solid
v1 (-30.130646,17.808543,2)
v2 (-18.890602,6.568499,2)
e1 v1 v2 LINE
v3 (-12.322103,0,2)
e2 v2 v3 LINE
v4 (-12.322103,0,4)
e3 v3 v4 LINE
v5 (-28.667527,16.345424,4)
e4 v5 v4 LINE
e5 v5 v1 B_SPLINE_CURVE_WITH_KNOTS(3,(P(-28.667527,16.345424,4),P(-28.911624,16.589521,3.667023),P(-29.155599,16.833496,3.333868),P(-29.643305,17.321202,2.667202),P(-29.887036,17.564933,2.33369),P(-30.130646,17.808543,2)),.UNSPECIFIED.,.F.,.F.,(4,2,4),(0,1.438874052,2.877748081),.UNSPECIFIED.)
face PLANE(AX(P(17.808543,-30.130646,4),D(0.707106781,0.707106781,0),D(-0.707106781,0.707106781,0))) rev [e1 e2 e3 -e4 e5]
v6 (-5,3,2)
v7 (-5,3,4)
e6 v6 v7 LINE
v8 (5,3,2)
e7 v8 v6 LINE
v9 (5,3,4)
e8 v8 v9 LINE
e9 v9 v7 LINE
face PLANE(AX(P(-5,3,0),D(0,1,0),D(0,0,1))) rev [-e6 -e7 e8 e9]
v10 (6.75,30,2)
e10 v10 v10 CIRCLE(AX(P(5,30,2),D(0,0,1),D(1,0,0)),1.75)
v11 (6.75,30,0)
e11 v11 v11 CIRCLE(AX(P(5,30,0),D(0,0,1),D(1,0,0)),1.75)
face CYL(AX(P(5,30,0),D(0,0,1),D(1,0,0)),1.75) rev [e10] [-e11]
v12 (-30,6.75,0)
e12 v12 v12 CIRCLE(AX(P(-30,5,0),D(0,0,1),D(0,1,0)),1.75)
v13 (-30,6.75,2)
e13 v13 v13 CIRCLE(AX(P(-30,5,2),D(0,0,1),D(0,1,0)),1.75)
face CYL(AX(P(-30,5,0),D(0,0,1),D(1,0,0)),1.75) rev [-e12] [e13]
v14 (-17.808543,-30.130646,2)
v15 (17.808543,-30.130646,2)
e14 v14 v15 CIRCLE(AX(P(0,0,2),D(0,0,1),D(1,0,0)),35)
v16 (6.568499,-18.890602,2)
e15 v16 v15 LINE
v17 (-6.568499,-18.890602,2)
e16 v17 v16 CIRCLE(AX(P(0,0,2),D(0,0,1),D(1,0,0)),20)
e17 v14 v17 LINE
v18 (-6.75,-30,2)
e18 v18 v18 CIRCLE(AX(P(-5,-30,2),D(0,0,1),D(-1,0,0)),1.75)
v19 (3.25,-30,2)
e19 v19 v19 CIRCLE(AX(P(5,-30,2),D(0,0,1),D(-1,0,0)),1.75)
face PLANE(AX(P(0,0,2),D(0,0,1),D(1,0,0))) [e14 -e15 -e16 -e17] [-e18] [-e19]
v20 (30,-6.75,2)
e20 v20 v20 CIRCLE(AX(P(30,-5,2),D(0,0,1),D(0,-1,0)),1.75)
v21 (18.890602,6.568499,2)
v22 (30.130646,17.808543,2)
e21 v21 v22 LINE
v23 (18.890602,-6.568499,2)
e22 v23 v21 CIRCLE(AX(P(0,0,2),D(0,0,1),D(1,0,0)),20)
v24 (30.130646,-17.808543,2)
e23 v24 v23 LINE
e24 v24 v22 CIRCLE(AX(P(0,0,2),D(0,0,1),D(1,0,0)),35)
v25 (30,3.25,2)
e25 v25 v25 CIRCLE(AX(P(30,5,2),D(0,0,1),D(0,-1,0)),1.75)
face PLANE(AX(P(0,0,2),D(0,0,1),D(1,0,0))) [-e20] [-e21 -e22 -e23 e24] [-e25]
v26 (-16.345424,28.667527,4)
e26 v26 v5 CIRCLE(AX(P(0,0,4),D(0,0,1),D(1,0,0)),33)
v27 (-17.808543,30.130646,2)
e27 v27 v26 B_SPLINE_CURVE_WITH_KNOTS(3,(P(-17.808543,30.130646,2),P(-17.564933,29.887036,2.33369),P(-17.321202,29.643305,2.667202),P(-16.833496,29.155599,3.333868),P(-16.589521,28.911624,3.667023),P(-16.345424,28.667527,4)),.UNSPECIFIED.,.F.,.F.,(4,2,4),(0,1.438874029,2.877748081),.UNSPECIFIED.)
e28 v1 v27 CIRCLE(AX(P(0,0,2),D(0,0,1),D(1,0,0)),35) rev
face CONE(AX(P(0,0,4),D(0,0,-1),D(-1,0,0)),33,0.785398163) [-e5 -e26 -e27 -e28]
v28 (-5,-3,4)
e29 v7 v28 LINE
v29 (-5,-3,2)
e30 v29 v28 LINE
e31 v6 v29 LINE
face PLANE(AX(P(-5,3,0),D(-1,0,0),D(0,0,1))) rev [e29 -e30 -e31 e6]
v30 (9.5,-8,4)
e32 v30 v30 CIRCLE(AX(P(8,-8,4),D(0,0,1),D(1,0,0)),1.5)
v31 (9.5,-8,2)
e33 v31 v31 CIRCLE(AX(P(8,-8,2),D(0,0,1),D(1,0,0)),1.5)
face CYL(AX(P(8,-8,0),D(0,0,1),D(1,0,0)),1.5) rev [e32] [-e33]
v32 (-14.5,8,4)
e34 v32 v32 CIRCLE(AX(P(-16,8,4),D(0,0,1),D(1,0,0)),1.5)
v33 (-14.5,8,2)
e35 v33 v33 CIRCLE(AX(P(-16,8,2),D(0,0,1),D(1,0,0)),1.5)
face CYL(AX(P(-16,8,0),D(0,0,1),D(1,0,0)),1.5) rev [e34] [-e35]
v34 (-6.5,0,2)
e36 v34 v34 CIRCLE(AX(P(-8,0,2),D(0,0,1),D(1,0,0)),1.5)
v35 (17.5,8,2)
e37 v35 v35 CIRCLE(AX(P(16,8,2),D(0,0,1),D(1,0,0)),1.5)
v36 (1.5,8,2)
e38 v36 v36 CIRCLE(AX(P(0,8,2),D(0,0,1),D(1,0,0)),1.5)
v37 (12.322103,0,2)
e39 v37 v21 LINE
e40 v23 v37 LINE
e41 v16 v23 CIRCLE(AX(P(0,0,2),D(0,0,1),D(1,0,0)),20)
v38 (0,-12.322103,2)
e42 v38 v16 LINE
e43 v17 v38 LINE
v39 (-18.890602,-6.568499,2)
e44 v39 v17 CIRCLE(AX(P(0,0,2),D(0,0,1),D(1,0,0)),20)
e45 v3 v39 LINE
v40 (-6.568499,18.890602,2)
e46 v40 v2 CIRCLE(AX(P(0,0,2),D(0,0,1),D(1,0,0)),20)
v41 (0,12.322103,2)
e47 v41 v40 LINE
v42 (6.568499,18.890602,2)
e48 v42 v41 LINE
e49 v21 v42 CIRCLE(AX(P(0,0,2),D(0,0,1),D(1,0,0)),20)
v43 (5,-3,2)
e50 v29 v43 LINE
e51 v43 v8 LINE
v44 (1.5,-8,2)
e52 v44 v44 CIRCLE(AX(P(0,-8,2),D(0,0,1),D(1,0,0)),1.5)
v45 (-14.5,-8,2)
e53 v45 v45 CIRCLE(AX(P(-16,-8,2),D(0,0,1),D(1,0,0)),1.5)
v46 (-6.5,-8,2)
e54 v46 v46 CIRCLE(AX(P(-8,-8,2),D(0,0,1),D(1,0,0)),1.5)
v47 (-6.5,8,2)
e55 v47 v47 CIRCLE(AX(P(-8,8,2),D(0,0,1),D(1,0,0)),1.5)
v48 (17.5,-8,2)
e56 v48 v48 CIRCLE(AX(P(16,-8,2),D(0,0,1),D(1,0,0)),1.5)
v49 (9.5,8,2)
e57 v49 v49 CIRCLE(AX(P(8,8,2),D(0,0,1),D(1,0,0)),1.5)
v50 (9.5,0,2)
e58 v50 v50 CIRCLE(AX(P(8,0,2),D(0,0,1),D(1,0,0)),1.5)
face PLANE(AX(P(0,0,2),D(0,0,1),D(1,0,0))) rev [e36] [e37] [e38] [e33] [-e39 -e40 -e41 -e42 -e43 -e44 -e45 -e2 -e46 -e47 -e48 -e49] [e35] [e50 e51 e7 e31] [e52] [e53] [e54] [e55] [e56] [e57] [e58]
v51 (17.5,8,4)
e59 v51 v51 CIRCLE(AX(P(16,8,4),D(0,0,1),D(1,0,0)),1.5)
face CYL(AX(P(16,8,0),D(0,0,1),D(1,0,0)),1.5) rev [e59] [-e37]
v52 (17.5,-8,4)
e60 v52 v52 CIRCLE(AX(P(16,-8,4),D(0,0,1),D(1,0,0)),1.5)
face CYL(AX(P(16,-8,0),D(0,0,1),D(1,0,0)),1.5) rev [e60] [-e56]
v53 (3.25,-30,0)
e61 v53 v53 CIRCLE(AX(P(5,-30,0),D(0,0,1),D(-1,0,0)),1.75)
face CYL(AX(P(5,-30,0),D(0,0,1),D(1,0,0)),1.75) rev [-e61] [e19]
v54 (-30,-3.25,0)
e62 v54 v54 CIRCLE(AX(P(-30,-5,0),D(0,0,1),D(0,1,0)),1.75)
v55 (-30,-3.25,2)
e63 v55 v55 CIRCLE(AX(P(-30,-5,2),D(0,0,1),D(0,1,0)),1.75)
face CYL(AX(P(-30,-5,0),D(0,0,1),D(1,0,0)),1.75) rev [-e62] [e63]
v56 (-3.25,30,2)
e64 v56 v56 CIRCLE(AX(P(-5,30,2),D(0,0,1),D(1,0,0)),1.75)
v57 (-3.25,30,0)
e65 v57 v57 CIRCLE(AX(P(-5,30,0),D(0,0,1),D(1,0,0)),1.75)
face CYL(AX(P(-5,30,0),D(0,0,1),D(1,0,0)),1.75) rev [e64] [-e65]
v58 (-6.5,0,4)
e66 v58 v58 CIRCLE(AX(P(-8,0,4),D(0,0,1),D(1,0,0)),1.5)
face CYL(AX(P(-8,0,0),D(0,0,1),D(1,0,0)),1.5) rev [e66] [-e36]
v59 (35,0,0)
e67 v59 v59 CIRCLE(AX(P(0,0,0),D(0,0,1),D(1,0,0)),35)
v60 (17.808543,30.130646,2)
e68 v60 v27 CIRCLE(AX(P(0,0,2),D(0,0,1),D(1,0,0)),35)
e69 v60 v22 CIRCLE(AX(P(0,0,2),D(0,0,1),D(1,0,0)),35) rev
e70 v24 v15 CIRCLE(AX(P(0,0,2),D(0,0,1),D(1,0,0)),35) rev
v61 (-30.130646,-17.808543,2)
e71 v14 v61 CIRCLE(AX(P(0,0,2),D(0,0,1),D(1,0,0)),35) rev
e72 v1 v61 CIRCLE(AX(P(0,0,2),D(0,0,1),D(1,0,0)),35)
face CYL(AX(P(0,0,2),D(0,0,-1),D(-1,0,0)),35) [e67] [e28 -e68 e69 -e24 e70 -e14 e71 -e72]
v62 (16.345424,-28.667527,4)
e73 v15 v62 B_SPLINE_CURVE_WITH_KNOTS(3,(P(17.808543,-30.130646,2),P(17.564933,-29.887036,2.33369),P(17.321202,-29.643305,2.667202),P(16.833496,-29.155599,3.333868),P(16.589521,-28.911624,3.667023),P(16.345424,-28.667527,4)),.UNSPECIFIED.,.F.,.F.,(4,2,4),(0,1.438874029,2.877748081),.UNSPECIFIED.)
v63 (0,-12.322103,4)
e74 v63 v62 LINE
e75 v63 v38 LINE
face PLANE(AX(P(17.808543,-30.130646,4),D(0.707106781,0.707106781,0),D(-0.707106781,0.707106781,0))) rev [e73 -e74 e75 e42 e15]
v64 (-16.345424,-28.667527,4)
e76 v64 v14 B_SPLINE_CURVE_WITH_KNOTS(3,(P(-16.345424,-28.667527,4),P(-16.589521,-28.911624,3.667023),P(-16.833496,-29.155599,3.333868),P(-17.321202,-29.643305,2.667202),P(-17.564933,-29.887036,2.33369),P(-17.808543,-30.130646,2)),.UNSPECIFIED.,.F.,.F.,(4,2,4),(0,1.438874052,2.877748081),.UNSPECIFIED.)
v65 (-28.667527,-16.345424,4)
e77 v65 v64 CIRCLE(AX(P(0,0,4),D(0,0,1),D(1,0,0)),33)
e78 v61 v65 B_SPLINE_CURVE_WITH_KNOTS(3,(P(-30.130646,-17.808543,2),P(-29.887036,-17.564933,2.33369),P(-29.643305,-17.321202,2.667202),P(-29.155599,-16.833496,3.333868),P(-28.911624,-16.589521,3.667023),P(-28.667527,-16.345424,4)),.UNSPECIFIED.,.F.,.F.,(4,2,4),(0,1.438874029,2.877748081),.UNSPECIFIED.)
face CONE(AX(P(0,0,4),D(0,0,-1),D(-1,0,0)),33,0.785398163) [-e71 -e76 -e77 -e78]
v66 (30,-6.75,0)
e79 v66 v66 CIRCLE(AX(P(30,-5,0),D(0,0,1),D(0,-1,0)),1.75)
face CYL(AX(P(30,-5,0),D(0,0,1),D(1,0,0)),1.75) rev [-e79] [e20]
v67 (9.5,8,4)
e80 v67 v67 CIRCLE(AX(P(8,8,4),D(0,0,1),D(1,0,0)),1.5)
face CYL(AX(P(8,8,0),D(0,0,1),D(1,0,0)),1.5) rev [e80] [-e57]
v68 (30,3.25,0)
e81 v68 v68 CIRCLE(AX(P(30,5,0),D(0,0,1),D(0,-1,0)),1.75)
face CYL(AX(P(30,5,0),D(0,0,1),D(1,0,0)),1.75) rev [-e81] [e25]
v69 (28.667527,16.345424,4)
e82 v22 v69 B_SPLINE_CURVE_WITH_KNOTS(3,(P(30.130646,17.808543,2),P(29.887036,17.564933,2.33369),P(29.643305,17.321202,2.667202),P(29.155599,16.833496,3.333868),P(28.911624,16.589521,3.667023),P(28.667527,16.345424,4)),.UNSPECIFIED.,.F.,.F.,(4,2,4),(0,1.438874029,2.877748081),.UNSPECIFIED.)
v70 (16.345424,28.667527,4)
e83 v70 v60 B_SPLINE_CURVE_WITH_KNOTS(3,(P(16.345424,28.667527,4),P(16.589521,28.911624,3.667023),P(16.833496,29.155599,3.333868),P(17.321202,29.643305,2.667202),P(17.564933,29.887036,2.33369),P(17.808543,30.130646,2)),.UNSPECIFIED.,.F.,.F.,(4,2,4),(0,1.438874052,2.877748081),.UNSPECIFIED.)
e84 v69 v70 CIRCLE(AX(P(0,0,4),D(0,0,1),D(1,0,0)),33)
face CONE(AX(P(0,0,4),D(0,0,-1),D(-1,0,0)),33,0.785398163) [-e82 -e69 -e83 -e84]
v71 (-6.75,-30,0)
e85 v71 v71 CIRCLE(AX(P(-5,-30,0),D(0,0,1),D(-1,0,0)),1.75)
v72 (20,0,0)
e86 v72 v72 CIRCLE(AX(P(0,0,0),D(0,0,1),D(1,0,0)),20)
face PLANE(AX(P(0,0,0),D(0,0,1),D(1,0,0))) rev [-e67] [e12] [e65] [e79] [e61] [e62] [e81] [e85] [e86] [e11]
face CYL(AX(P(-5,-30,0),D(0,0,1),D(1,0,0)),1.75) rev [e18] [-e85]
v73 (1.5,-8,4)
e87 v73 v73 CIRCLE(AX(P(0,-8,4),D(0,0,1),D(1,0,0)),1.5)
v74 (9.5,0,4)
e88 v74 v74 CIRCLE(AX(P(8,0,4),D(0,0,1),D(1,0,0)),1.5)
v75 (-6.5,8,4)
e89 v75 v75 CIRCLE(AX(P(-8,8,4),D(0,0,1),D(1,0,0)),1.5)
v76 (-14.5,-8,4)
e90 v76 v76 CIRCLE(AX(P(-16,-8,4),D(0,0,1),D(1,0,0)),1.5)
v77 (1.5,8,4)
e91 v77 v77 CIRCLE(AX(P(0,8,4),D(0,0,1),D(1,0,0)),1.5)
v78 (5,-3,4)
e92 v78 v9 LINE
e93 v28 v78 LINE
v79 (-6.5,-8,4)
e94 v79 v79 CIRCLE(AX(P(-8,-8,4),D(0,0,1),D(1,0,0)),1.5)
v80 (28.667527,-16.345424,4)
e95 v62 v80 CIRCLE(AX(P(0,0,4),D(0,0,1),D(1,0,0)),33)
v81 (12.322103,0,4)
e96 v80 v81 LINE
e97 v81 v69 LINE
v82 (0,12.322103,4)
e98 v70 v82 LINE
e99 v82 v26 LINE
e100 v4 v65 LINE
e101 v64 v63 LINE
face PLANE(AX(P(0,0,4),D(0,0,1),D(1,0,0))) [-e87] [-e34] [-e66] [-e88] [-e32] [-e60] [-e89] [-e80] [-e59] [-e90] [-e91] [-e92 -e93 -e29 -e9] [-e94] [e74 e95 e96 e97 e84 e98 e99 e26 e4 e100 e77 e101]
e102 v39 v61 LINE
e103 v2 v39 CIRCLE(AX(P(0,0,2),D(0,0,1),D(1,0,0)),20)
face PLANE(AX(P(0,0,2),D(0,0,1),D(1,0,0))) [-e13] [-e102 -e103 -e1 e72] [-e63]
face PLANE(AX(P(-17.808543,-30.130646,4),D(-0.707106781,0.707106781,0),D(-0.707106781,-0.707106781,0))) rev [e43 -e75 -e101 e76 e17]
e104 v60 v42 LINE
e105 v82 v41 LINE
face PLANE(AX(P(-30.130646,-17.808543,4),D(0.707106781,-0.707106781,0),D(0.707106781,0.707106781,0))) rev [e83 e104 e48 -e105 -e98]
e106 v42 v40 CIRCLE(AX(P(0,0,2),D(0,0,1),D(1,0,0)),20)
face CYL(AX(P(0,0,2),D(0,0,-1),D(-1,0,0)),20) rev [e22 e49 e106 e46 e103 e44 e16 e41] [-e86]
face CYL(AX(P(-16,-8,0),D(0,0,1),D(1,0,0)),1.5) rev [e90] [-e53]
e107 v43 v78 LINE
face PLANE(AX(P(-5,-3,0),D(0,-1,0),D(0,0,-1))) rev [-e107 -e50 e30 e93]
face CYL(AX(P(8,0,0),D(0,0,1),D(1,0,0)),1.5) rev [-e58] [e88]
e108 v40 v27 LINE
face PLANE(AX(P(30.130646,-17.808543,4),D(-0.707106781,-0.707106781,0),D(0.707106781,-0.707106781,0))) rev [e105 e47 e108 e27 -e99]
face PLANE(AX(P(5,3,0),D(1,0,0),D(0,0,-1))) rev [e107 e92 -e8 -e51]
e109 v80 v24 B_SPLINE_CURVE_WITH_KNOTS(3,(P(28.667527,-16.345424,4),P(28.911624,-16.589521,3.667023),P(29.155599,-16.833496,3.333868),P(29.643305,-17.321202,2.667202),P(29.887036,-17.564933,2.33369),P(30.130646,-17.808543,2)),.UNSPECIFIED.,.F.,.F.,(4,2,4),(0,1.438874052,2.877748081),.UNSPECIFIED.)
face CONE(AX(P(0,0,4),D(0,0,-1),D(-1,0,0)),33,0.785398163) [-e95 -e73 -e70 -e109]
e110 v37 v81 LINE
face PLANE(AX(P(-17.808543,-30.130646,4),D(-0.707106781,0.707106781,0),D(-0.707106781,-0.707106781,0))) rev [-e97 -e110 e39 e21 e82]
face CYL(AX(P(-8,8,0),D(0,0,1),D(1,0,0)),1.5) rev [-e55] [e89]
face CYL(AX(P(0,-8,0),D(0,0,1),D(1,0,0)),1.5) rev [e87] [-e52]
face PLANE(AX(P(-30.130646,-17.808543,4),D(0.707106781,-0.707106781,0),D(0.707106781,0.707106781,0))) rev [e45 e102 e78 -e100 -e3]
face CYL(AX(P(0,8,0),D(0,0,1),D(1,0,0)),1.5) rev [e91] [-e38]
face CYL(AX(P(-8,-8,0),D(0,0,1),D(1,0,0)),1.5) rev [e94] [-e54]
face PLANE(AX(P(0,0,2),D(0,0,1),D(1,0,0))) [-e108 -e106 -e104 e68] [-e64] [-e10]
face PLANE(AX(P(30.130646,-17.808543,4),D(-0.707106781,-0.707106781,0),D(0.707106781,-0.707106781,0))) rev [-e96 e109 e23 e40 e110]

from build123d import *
from build123d.topology import SkipClean

# Parameters (mm, degrees)
SKETCH1_R                    = 35
SKETCH1_R_2                  = 20
BOSS_EXTRUDE1_DEPTH          = 2
SKETCH2_R                    = 1.75
CUT_EXTRUDE1_DEPTH           = 50.537864306
CIRPATTERN1_COUNT            = 4
BOSS_EXTRUDE2_DEPTH          = 2
CHAMFER1_SIZE                = 2
CIRPATTERN2_COUNT            = 2
CIRPATTERN2_ANGLE            = 90
CHAMFER1_OF_CIRPATTERN2_SIZE = 2
SKETCH5_R                    = 1.5
SKETCH5_W                    = 10
SKETCH5_H                    = 6
CUT_EXTRUDE2_DEPTH           = 50.658836072


with BuildPart() as part:
    # Sketch1 → Boss-Extrude1 (new body)
    with BuildSketch(Plane.XY):
        Circle(SKETCH1_R)
        Circle(SKETCH1_R_2, mode=Mode.SUBTRACT)
    extrude(amount=BOSS_EXTRUDE1_DEPTH)

    # Sketch2 → Cut-Extrude1 (cut, through all)
    with BuildSketch(Plane.XY.offset(2)):
        with Locations((5, 30)):
            Circle(SKETCH2_R)
        with Locations((-5, 30)):
            Circle(SKETCH2_R)
    cut_extrude1 = extrude(amount=-CUT_EXTRUDE1_DEPTH, mode=Mode.SUBTRACT)

    # CirPattern1: Cut-Extrude1 ×4 about axis
    cirpattern1_axis = Axis((0, 0, 0), (0, 0, 1))
    for i in range(1, CIRPATTERN1_COUNT):
        add(cut_extrude1.rotate(cirpattern1_axis, i * 360 / CIRPATTERN1_COUNT), mode=Mode.SUBTRACT)

    # Sketch3 → Boss-Extrude2 (add)
    with SkipClean():  # the faces are left unmerged after this step: merging them gives an invalid solid
        with BuildSketch(Plane.XY.offset(2)):
            with BuildLine():
                Line((-30.130645656, -17.80854268), (17.80854268, 30.130645656))
                ThreePointArc((17.80854268, 30.130645656), (24.748737342, 24.748737342), (30.130645656, 17.80854268))
                Line((30.130645656, 17.80854268), (-17.80854268, -30.130645656))
                ThreePointArc((-17.80854268, -30.130645656), (-24.748737342, -24.748737342), (-30.130645656, -17.80854268))
            make_face()
        boss_extrude2 = extrude(amount=BOSS_EXTRUDE2_DEPTH)

    # Chamfer1
    chamfer1_edges = [part.edges().sort_by_distance(p)[0] for p in [
        (-24.748737342, -24.748737342, 4),
        (24.748737342, 24.748737342, 4),
    ]]
    chamfer(chamfer1_edges, length=CHAMFER1_SIZE - 0.0001)  # a hair under: the kernel refuses the full size

    # CirPattern2: Boss-Extrude2 ×2 about axis
    with SkipClean():  # the faces are left unmerged after this step: merging them gives an invalid solid
        cirpattern2_axis = Axis((0, 0, 0), (0, 0, 1))
        for i in range(1, CIRPATTERN2_COUNT):
            add(boss_extrude2.rotate(cirpattern2_axis, i * CIRPATTERN2_ANGLE / (CIRPATTERN2_COUNT - 1)))

    # Chamfer1 of CirPattern2
    chamfer1_of_cirpattern2_edges = [part.edges().sort_by_distance(p)[0] for p in [
        (24.748737342, -24.748737342, 4),
        (-24.748737342, 24.748737342, 4),
    ]]
    chamfer(chamfer1_of_cirpattern2_edges, length=CHAMFER1_OF_CIRPATTERN2_SIZE - 0.0001)  # a hair under: the kernel refuses the full size

    # Sketch5 → Cut-Extrude2 (cut, through all)
    with BuildSketch(Plane.XY.offset(4)):
        with Locations((0, 8)):
            Circle(SKETCH5_R)
        with Locations((-8, 8)):
            Circle(SKETCH5_R)
        with Locations((-8, 0)):
            Circle(SKETCH5_R)
        with Locations((-8, -8)):
            Circle(SKETCH5_R)
        with Locations((8, -8)):
            Circle(SKETCH5_R)
        with Locations((8, 0)):
            Circle(SKETCH5_R)
        with Locations((8, 8)):
            Circle(SKETCH5_R)
        with Locations((0, -8)):
            Circle(SKETCH5_R)
        with Locations((-16, 8)):
            Circle(SKETCH5_R)
        with Locations((-16, 0)):
            Circle(SKETCH5_R)
        with Locations((-16, -8)):
            Circle(SKETCH5_R)
        with Locations((16, -8)):
            Circle(SKETCH5_R)
        with Locations((16, 0)):
            Circle(SKETCH5_R)
        with Locations((16, 8)):
            Circle(SKETCH5_R)
        Rectangle(SKETCH5_W, SKETCH5_H)
    extrude(amount=-CUT_EXTRUDE2_DEPTH, mode=Mode.SUBTRACT)


solid = part.part
